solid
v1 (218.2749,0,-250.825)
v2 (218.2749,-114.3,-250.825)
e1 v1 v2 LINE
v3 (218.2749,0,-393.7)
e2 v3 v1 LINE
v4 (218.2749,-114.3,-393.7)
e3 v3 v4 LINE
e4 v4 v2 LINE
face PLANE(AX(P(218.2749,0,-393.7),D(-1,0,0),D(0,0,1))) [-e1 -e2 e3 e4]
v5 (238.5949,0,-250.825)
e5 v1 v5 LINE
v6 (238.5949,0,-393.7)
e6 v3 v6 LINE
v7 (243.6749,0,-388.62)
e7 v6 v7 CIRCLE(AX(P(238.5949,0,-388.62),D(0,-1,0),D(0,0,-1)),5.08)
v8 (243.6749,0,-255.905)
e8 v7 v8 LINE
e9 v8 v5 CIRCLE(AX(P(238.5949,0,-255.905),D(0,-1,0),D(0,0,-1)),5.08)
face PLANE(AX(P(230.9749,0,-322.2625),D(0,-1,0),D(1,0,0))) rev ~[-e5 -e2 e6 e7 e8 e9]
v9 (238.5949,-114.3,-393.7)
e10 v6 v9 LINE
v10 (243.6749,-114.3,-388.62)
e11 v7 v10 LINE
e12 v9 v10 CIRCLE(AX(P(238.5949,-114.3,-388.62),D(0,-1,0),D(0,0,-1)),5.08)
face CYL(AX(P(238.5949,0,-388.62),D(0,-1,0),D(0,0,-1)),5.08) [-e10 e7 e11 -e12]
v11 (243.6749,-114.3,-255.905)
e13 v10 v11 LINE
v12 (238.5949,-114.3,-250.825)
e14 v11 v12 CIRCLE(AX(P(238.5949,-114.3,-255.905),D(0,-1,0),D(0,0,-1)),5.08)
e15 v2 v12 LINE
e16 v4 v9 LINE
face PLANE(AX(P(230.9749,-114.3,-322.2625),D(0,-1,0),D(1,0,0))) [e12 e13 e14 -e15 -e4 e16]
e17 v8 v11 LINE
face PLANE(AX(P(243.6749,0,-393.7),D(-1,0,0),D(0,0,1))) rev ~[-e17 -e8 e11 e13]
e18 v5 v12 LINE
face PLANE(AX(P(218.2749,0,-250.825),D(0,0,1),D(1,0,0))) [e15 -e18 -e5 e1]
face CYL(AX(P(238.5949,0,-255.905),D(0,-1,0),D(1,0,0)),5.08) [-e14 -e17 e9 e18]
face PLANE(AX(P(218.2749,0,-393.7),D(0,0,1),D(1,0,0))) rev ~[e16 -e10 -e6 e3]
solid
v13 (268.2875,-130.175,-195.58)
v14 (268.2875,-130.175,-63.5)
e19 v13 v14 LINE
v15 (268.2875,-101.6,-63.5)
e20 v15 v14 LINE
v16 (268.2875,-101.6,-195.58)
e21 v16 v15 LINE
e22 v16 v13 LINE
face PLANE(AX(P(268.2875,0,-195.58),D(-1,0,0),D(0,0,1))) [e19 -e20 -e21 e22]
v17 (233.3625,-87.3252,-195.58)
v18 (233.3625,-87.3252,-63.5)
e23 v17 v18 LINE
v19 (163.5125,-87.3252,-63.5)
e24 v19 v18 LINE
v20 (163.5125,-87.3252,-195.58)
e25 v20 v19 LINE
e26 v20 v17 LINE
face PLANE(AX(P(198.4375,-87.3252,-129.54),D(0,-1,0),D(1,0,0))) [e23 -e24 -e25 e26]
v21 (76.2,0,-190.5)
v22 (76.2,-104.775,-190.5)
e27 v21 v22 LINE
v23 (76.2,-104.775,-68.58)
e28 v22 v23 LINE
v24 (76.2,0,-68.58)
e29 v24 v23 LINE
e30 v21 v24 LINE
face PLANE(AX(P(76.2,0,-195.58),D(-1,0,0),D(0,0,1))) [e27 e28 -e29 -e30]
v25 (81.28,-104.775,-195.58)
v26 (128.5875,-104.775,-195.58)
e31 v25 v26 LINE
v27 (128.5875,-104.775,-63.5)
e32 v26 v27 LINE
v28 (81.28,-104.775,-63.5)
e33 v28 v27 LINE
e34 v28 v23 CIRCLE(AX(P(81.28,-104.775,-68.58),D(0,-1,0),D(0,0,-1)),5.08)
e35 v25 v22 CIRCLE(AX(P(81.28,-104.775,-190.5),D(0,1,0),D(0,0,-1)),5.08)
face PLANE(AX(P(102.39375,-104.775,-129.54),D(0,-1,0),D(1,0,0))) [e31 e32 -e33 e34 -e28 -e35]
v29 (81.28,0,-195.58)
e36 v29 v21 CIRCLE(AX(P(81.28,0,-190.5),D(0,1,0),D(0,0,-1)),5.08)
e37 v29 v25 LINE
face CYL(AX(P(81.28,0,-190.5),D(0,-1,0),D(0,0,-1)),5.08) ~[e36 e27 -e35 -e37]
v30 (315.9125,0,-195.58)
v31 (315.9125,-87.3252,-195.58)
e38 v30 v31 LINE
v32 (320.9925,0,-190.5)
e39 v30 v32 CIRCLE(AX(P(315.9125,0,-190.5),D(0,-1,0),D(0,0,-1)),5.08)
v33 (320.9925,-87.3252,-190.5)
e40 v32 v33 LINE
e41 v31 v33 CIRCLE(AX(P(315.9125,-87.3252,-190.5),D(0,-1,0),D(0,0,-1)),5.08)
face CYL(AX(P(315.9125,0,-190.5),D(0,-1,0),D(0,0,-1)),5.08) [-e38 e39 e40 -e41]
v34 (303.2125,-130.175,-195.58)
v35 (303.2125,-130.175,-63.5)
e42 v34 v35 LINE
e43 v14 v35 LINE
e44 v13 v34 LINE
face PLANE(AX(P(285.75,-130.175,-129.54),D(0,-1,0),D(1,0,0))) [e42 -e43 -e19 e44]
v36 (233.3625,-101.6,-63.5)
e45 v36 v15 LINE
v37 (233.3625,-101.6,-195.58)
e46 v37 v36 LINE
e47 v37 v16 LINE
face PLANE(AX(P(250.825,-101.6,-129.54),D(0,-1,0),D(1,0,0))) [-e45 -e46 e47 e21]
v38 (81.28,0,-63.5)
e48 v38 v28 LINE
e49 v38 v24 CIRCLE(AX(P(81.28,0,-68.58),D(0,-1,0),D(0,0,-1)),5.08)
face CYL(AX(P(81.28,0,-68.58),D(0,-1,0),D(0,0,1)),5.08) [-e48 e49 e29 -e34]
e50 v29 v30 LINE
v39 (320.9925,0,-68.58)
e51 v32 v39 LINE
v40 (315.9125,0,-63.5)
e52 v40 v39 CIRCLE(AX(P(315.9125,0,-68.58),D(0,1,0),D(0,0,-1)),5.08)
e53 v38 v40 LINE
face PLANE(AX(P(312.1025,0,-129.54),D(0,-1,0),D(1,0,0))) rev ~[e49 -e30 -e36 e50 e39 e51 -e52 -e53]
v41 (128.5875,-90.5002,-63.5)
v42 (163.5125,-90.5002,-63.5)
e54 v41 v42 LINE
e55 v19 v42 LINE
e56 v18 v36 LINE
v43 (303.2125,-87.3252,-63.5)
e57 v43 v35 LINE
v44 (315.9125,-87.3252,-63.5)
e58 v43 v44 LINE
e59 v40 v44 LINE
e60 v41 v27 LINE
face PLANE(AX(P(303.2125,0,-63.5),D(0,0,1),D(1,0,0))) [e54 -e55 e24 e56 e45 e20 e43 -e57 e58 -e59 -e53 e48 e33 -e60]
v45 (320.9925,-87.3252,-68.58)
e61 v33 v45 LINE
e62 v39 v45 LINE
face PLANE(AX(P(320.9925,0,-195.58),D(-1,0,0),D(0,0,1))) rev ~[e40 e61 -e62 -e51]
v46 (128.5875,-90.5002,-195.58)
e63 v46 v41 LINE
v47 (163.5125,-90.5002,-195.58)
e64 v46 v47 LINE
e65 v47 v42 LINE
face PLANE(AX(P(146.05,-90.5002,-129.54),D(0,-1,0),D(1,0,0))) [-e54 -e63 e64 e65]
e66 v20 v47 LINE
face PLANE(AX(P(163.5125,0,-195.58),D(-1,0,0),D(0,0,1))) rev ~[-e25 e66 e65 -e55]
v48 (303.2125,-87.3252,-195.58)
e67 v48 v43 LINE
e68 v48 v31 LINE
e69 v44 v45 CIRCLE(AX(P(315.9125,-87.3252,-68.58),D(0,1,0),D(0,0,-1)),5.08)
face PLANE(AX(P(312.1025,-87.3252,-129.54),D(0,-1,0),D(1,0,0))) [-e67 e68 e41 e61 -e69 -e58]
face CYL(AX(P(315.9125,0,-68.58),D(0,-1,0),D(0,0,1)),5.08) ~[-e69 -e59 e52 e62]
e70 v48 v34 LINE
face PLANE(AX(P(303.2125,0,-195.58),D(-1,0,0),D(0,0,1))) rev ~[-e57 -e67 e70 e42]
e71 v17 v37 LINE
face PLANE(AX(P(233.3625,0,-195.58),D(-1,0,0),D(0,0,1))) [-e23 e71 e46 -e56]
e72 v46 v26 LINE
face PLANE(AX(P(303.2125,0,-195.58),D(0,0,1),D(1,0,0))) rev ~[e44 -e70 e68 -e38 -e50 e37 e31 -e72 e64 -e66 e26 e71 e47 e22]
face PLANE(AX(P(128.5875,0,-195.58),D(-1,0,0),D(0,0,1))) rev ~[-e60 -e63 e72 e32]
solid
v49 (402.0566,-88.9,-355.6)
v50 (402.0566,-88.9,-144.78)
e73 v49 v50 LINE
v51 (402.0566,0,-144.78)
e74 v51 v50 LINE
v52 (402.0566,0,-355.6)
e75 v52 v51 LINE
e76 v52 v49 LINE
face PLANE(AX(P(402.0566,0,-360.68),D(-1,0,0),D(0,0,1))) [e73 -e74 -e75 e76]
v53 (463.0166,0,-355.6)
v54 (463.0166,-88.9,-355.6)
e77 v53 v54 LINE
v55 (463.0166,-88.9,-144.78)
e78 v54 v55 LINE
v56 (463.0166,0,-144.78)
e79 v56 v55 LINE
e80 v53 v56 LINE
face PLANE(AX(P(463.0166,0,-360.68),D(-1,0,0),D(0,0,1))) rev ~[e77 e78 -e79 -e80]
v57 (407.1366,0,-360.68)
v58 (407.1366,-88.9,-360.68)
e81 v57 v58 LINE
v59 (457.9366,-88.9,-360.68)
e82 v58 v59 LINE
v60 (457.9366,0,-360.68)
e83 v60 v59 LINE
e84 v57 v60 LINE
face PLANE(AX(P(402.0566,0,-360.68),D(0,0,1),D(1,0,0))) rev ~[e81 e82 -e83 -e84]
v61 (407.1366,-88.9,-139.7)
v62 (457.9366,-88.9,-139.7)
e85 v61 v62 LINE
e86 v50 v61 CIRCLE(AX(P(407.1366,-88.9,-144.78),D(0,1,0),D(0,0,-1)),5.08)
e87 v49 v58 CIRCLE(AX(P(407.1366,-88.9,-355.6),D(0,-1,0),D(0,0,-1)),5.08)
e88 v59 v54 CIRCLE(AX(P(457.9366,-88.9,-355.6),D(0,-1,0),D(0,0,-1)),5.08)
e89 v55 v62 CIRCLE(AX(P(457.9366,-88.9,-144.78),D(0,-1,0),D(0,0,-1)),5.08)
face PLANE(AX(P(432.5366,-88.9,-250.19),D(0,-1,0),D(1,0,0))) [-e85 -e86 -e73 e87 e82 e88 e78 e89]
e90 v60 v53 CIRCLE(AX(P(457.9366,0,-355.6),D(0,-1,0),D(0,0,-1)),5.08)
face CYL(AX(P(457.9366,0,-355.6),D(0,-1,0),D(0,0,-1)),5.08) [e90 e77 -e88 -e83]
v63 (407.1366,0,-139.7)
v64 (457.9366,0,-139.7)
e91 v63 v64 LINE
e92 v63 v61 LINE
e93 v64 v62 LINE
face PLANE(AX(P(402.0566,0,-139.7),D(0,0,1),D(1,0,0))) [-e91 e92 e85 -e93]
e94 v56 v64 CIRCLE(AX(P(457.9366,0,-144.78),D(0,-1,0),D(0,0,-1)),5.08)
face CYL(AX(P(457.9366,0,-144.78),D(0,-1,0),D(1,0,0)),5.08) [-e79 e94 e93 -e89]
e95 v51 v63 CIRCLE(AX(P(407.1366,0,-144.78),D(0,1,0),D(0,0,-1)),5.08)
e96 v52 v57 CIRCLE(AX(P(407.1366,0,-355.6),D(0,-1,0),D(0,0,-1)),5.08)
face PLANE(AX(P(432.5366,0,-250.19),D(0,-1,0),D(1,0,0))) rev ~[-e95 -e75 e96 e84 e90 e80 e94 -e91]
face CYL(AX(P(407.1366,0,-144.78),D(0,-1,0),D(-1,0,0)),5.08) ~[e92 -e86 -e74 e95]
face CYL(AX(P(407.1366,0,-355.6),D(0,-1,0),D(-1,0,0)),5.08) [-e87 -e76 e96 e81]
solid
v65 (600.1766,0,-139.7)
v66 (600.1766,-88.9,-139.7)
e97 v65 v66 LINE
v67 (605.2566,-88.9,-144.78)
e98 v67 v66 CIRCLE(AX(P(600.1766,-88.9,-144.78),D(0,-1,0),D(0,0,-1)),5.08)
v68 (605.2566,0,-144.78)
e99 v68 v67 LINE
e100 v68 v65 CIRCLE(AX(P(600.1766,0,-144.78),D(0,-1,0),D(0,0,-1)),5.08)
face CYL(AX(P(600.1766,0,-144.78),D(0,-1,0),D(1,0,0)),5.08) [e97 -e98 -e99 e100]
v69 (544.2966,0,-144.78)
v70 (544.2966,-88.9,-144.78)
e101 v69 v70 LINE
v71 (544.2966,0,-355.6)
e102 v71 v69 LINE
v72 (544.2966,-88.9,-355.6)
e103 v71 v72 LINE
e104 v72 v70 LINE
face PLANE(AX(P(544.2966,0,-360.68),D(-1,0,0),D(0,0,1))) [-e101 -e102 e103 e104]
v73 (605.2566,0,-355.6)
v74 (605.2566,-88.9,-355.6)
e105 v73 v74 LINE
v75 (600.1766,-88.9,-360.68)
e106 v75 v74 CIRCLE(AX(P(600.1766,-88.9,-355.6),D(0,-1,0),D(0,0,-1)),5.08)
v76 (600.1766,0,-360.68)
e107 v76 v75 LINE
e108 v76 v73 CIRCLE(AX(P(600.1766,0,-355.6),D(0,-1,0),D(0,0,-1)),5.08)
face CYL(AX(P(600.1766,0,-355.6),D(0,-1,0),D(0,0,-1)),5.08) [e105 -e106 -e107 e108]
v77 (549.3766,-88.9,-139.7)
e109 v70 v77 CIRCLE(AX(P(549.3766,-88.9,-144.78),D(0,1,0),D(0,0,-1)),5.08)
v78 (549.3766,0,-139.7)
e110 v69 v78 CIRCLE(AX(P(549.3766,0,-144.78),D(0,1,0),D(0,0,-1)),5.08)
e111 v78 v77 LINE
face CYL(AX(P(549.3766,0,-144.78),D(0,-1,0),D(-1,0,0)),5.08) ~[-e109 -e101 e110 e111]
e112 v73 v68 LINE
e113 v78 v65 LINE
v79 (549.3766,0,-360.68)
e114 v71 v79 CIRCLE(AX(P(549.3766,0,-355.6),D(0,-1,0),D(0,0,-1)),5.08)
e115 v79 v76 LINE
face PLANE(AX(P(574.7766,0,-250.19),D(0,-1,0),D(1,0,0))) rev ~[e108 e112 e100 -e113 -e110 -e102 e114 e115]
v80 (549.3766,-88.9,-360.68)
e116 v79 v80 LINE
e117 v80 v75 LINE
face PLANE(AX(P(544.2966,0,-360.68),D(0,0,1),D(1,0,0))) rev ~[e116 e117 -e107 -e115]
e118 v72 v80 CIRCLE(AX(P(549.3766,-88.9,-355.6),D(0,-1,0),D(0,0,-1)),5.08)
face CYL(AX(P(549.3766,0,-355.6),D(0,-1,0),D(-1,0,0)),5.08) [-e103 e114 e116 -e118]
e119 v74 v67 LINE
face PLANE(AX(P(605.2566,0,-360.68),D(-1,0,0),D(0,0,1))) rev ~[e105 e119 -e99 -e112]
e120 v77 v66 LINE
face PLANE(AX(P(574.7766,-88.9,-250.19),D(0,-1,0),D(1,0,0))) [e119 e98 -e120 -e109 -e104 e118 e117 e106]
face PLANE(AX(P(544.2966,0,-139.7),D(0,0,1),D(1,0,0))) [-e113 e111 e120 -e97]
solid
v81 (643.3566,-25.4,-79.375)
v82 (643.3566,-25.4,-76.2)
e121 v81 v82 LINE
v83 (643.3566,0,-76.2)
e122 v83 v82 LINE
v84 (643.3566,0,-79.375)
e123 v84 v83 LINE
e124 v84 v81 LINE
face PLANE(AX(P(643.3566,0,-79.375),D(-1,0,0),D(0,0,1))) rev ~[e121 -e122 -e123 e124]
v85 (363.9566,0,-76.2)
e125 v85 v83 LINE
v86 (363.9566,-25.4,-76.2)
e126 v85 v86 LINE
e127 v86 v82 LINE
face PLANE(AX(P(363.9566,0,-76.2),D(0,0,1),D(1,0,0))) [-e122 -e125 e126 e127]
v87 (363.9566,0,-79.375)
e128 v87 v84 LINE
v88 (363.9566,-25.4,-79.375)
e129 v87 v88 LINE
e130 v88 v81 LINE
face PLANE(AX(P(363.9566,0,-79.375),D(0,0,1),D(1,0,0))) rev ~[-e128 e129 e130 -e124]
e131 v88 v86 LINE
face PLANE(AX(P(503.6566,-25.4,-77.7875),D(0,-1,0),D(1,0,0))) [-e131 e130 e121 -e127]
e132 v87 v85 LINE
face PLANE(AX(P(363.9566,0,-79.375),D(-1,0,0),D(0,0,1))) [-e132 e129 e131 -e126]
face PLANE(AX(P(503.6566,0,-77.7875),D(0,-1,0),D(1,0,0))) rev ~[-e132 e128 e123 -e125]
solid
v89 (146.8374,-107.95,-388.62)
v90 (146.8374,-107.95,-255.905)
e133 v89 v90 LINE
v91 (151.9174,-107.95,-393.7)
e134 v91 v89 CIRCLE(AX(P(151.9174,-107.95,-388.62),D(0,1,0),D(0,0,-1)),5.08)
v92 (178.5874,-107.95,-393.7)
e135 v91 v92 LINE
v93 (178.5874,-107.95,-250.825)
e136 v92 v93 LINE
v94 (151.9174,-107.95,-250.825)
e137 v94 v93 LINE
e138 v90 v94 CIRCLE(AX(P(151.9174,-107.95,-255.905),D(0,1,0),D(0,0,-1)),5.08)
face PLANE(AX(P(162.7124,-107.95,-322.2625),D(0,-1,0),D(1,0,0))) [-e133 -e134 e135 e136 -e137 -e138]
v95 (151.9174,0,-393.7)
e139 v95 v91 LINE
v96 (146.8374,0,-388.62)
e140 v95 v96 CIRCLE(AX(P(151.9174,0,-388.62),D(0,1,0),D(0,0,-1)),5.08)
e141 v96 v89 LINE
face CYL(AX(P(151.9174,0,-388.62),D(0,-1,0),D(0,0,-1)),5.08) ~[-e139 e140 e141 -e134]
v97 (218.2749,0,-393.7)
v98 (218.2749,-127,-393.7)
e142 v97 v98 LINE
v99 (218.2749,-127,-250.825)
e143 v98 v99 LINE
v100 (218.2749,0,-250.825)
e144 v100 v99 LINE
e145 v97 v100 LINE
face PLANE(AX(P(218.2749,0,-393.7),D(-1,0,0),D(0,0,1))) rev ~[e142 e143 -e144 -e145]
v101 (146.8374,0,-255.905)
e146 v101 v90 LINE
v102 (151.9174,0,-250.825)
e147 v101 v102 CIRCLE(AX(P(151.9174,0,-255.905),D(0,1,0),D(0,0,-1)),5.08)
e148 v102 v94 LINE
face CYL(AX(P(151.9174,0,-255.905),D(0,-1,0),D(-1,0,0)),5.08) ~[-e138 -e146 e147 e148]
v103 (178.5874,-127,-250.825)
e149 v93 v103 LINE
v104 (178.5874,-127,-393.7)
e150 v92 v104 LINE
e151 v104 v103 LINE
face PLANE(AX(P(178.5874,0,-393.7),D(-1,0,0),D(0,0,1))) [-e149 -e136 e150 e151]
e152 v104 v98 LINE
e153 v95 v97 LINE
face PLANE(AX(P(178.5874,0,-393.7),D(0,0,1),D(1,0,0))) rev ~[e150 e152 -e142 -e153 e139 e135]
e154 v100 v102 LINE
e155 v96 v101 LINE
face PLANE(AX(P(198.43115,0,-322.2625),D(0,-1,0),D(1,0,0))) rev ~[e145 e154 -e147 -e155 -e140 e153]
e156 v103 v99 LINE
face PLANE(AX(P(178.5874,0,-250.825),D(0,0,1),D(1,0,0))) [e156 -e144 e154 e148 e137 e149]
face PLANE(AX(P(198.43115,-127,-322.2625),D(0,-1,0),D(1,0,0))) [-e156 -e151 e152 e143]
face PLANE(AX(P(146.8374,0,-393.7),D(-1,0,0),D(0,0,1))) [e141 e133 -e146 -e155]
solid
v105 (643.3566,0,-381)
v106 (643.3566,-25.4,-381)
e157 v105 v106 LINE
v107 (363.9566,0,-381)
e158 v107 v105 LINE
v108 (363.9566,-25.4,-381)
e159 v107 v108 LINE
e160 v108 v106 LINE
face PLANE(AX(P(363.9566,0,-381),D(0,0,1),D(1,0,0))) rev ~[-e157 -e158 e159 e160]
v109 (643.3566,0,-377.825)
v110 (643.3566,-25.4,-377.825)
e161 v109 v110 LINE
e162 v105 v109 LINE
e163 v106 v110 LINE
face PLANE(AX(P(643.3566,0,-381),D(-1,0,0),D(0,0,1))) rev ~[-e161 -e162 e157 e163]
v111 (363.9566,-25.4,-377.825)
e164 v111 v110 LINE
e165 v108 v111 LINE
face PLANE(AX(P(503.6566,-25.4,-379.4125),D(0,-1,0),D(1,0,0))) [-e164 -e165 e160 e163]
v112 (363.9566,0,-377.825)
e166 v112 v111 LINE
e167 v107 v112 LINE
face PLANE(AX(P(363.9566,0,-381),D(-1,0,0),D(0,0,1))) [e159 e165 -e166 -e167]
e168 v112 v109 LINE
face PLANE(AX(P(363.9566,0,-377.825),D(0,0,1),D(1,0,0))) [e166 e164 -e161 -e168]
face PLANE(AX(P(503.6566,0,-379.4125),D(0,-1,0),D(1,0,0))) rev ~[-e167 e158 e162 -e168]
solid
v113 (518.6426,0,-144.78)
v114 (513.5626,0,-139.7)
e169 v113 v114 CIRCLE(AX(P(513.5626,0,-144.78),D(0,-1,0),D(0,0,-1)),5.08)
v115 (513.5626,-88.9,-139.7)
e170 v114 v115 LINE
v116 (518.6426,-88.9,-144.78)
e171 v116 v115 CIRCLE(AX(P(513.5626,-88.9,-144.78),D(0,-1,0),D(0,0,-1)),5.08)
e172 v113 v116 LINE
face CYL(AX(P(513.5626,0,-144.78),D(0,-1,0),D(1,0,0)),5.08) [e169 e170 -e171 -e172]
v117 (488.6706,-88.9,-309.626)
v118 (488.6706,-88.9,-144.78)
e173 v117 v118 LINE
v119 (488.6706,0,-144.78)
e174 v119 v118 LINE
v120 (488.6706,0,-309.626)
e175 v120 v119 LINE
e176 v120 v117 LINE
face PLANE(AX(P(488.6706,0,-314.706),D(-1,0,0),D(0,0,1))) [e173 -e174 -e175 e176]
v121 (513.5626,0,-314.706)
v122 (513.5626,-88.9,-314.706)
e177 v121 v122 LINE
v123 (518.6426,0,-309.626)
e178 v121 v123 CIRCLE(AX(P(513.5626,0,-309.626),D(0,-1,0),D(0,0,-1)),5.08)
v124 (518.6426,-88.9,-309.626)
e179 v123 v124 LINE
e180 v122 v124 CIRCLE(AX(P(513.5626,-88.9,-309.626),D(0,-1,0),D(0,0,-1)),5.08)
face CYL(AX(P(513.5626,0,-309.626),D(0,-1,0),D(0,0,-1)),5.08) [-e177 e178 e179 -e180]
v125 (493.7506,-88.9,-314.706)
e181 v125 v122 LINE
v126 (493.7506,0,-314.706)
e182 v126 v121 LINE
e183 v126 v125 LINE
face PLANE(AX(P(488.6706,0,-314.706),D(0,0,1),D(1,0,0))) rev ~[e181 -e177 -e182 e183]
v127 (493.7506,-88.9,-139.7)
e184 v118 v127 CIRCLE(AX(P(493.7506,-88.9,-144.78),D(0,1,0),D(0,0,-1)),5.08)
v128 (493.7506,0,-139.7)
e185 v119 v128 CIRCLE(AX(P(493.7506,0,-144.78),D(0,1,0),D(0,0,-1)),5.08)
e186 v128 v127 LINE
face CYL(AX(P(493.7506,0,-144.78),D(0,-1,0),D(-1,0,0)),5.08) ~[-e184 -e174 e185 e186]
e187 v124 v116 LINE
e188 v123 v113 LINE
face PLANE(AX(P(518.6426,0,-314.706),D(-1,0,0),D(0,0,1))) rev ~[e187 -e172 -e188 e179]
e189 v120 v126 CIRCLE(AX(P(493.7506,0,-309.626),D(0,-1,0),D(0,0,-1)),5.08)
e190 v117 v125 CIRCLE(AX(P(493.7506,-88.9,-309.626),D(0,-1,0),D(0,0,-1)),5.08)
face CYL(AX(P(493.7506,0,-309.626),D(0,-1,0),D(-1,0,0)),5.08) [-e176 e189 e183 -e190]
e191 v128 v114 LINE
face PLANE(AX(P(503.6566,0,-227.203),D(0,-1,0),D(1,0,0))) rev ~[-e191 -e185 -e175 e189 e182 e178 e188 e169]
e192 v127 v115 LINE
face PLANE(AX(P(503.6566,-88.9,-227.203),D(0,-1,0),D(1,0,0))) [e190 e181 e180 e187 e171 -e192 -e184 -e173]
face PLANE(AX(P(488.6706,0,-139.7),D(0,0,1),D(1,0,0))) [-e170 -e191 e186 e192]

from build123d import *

# Parameters (mm, degrees)
F0_W      = 60.96
F0_H      = 220.98
F1_DEPTH  = 88.9
F0_W_2    = 29.972
F0_H_2    = 175.006
F2_R      = 5.08
F2_2_R    = 5.08
F2_3_R    = 5.08
F3_R      = 5.08
F0_W_3    = 52.3875
F0_H_3    = 132.08
F4_DEPTH  = 104.775
F0_W_4    = 34.925
F5_DEPTH  = 90.5002
F0_W_5    = 69.85
F6_DEPTH  = 87.3252
F7_DEPTH  = 101.6
F8_DEPTH  = 130.175
F0_W_6    = 17.78
F9_DEPTH  = 87.3252
F0_W_7    = 31.75
F0_H_4    = 142.875
F10_DEPTH = 107.95
F0_W_8    = 39.6875
F11_DEPTH = 127
F0_W_9    = 25.4
F12_DEPTH = 114.3
F13_W     = 279.4
F13_H     = 3.175
F14_DEPTH = 25.4
F15_R     = 5.08
F15_2_R   = 5.08
F15_3_R   = 5.08


with BuildPart() as f1:
    # F0 (on Front) → F1 (new body)
    with BuildSketch(Plane.XZ):
        with Locations((432.5366, -250.19)):
            Rectangle(F0_W, F0_H)
    extrude(amount=F1_DEPTH)

    # F2
    f2_edges = [f1.edges().sort_by_distance(p)[0] for p in [
        (463.0166, -44.45, -139.7),
        (402.0566, -44.45, -139.7),
        (402.0566, -44.45, -360.68),
        (463.0166, -44.45, -360.68),
    ]]
    fillet(f2_edges, radius=F2_R)


with BuildPart() as f1b:
    # F0 (on Front) → F1, piece 2 (new body)
    with BuildSketch(Plane.XZ):
        with Locations((574.7766, -250.19)):
            Rectangle(F0_W, F0_H)
    extrude(amount=F1_DEPTH)

    # F2#2
    f2_2_edges = [f1b.edges().sort_by_distance(p)[0] for p in [
        (605.2566, -44.45, -139.7),
        (544.2966, -44.45, -139.7),
        (544.2966, -44.45, -360.68),
        (605.2566, -44.45, -360.68),
    ]]
    fillet(f2_2_edges, radius=F2_2_R)


with BuildPart() as f1c:
    # F0 (on Front) → F1, piece 3 (new body)
    with BuildSketch(Plane.XZ):
        with Locations((503.6566, -227.203)):
            Rectangle(F0_W_2, F0_H_2)
    extrude(amount=F1_DEPTH)

    # F2#3
    f2_3_edges = [f1c.edges().sort_by_distance(p)[0] for p in [
        (518.6426, -44.45, -139.7),
        (488.6706, -44.45, -314.706),
        (518.6426, -44.45, -314.706),
    ]]
    fillet(f2_3_edges, radius=F2_3_R)

    # F3
    f3_edges = [f1c.edges().sort_by_distance(p)[0] for p in [
        (488.6706, -44.45, -139.7),
    ]]
    fillet(f3_edges, radius=F3_R)


with BuildPart() as f4:
    # F0 (on Front) → F4 (new body)
    with BuildSketch(Plane.XZ):
        with Locations((102.39375, -129.54)):
            Rectangle(F0_W_3, F0_H_3)
    extrude(amount=F4_DEPTH)

    # F0 (on Front) → F5 (join)
    with BuildSketch(Plane.XZ):
        with Locations((146.05, -129.54)):
            Rectangle(F0_W_4, F0_H_3)
    extrude(amount=F5_DEPTH)

    # F0 (on Front) → F6 (join)
    with BuildSketch(Plane.XZ):
        with Locations((198.4375, -129.54)):
            Rectangle(F0_W_5, F0_H_3)
    extrude(amount=F6_DEPTH)

    # F0 (on Front) → F7 (join)
    with BuildSketch(Plane.XZ):
        with Locations((250.825, -129.54)):
            Rectangle(F0_W_4, F0_H_3)
    extrude(amount=F7_DEPTH)

    # F0 (on Front) → F8 (join)
    with BuildSketch(Plane.XZ):
        with Locations((285.75, -129.54)):
            Rectangle(F0_W_4, F0_H_3)
    extrude(amount=F8_DEPTH)

    # F0 (on Front) → F9 (join)
    with BuildSketch(Plane.XZ):
        with Locations((312.1025, -129.54)):
            Rectangle(F0_W_6, F0_H_3)
    extrude(amount=F9_DEPTH)

    # F15
    f15_edges = [f4.edges().sort_by_distance(p)[0] for p in [
        (320.9925, -43.6626, -63.5),
        (76.2, -52.3875, -63.5),
        (320.9925, -43.6626, -195.58),
        (76.2, -52.3875, -195.58),
    ]]
    fillet(f15_edges, radius=F15_R)


with BuildPart() as f10:
    # F0 (on Front) → F10 (new body)
    with BuildSketch(Plane.XZ):
        with Locations((162.7124, -322.2625)):
            Rectangle(F0_W_7, F0_H_4)
    extrude(amount=F10_DEPTH)

    # F0 (on Front) → F11 (join)
    with BuildSketch(Plane.XZ):
        with Locations((198.43115, -322.2625)):
            Rectangle(F0_W_8, F0_H_4)
    extrude(amount=F11_DEPTH)

    # F15#2
    f15_2_edges = [f10.edges().sort_by_distance(p)[0] for p in [
        (146.8374, -53.975, -250.825),
        (146.8374, -53.975, -393.7),
    ]]
    fillet(f15_2_edges, radius=F15_2_R)


with BuildPart() as f12:
    # F0 (on Front) → F12 (new body)
    with BuildSketch(Plane.XZ):
        with Locations((230.9749, -322.2625)):
            Rectangle(F0_W_9, F0_H_4)
    extrude(amount=F12_DEPTH)

    # F15#3
    f15_3_edges = [f12.edges().sort_by_distance(p)[0] for p in [
        (243.6749, -57.15, -250.825),
        (243.6749, -57.15, -393.7),
    ]]
    fillet(f15_3_edges, radius=F15_3_R)


with BuildPart() as f14:
    # F13 (on Front) → F14 (new body)
    with BuildSketch(Plane.XZ):
        with Locations((503.6566, -77.7875)):
            Rectangle(F13_W, F13_H)
    extrude(amount=F14_DEPTH)


with BuildPart() as f14b:
    # F13 (on Front) → F14, piece 2 (new body)
    with BuildSketch(Plane.XZ):
        with Locations((503.6566, -379.4125)):
            Rectangle(F13_W, F13_H)
    extrude(amount=F14_DEPTH)


solid = Compound([f1.part, f1b.part, f1c.part, f4.part, f10.part, f12.part, f14.part, f14b.part])
